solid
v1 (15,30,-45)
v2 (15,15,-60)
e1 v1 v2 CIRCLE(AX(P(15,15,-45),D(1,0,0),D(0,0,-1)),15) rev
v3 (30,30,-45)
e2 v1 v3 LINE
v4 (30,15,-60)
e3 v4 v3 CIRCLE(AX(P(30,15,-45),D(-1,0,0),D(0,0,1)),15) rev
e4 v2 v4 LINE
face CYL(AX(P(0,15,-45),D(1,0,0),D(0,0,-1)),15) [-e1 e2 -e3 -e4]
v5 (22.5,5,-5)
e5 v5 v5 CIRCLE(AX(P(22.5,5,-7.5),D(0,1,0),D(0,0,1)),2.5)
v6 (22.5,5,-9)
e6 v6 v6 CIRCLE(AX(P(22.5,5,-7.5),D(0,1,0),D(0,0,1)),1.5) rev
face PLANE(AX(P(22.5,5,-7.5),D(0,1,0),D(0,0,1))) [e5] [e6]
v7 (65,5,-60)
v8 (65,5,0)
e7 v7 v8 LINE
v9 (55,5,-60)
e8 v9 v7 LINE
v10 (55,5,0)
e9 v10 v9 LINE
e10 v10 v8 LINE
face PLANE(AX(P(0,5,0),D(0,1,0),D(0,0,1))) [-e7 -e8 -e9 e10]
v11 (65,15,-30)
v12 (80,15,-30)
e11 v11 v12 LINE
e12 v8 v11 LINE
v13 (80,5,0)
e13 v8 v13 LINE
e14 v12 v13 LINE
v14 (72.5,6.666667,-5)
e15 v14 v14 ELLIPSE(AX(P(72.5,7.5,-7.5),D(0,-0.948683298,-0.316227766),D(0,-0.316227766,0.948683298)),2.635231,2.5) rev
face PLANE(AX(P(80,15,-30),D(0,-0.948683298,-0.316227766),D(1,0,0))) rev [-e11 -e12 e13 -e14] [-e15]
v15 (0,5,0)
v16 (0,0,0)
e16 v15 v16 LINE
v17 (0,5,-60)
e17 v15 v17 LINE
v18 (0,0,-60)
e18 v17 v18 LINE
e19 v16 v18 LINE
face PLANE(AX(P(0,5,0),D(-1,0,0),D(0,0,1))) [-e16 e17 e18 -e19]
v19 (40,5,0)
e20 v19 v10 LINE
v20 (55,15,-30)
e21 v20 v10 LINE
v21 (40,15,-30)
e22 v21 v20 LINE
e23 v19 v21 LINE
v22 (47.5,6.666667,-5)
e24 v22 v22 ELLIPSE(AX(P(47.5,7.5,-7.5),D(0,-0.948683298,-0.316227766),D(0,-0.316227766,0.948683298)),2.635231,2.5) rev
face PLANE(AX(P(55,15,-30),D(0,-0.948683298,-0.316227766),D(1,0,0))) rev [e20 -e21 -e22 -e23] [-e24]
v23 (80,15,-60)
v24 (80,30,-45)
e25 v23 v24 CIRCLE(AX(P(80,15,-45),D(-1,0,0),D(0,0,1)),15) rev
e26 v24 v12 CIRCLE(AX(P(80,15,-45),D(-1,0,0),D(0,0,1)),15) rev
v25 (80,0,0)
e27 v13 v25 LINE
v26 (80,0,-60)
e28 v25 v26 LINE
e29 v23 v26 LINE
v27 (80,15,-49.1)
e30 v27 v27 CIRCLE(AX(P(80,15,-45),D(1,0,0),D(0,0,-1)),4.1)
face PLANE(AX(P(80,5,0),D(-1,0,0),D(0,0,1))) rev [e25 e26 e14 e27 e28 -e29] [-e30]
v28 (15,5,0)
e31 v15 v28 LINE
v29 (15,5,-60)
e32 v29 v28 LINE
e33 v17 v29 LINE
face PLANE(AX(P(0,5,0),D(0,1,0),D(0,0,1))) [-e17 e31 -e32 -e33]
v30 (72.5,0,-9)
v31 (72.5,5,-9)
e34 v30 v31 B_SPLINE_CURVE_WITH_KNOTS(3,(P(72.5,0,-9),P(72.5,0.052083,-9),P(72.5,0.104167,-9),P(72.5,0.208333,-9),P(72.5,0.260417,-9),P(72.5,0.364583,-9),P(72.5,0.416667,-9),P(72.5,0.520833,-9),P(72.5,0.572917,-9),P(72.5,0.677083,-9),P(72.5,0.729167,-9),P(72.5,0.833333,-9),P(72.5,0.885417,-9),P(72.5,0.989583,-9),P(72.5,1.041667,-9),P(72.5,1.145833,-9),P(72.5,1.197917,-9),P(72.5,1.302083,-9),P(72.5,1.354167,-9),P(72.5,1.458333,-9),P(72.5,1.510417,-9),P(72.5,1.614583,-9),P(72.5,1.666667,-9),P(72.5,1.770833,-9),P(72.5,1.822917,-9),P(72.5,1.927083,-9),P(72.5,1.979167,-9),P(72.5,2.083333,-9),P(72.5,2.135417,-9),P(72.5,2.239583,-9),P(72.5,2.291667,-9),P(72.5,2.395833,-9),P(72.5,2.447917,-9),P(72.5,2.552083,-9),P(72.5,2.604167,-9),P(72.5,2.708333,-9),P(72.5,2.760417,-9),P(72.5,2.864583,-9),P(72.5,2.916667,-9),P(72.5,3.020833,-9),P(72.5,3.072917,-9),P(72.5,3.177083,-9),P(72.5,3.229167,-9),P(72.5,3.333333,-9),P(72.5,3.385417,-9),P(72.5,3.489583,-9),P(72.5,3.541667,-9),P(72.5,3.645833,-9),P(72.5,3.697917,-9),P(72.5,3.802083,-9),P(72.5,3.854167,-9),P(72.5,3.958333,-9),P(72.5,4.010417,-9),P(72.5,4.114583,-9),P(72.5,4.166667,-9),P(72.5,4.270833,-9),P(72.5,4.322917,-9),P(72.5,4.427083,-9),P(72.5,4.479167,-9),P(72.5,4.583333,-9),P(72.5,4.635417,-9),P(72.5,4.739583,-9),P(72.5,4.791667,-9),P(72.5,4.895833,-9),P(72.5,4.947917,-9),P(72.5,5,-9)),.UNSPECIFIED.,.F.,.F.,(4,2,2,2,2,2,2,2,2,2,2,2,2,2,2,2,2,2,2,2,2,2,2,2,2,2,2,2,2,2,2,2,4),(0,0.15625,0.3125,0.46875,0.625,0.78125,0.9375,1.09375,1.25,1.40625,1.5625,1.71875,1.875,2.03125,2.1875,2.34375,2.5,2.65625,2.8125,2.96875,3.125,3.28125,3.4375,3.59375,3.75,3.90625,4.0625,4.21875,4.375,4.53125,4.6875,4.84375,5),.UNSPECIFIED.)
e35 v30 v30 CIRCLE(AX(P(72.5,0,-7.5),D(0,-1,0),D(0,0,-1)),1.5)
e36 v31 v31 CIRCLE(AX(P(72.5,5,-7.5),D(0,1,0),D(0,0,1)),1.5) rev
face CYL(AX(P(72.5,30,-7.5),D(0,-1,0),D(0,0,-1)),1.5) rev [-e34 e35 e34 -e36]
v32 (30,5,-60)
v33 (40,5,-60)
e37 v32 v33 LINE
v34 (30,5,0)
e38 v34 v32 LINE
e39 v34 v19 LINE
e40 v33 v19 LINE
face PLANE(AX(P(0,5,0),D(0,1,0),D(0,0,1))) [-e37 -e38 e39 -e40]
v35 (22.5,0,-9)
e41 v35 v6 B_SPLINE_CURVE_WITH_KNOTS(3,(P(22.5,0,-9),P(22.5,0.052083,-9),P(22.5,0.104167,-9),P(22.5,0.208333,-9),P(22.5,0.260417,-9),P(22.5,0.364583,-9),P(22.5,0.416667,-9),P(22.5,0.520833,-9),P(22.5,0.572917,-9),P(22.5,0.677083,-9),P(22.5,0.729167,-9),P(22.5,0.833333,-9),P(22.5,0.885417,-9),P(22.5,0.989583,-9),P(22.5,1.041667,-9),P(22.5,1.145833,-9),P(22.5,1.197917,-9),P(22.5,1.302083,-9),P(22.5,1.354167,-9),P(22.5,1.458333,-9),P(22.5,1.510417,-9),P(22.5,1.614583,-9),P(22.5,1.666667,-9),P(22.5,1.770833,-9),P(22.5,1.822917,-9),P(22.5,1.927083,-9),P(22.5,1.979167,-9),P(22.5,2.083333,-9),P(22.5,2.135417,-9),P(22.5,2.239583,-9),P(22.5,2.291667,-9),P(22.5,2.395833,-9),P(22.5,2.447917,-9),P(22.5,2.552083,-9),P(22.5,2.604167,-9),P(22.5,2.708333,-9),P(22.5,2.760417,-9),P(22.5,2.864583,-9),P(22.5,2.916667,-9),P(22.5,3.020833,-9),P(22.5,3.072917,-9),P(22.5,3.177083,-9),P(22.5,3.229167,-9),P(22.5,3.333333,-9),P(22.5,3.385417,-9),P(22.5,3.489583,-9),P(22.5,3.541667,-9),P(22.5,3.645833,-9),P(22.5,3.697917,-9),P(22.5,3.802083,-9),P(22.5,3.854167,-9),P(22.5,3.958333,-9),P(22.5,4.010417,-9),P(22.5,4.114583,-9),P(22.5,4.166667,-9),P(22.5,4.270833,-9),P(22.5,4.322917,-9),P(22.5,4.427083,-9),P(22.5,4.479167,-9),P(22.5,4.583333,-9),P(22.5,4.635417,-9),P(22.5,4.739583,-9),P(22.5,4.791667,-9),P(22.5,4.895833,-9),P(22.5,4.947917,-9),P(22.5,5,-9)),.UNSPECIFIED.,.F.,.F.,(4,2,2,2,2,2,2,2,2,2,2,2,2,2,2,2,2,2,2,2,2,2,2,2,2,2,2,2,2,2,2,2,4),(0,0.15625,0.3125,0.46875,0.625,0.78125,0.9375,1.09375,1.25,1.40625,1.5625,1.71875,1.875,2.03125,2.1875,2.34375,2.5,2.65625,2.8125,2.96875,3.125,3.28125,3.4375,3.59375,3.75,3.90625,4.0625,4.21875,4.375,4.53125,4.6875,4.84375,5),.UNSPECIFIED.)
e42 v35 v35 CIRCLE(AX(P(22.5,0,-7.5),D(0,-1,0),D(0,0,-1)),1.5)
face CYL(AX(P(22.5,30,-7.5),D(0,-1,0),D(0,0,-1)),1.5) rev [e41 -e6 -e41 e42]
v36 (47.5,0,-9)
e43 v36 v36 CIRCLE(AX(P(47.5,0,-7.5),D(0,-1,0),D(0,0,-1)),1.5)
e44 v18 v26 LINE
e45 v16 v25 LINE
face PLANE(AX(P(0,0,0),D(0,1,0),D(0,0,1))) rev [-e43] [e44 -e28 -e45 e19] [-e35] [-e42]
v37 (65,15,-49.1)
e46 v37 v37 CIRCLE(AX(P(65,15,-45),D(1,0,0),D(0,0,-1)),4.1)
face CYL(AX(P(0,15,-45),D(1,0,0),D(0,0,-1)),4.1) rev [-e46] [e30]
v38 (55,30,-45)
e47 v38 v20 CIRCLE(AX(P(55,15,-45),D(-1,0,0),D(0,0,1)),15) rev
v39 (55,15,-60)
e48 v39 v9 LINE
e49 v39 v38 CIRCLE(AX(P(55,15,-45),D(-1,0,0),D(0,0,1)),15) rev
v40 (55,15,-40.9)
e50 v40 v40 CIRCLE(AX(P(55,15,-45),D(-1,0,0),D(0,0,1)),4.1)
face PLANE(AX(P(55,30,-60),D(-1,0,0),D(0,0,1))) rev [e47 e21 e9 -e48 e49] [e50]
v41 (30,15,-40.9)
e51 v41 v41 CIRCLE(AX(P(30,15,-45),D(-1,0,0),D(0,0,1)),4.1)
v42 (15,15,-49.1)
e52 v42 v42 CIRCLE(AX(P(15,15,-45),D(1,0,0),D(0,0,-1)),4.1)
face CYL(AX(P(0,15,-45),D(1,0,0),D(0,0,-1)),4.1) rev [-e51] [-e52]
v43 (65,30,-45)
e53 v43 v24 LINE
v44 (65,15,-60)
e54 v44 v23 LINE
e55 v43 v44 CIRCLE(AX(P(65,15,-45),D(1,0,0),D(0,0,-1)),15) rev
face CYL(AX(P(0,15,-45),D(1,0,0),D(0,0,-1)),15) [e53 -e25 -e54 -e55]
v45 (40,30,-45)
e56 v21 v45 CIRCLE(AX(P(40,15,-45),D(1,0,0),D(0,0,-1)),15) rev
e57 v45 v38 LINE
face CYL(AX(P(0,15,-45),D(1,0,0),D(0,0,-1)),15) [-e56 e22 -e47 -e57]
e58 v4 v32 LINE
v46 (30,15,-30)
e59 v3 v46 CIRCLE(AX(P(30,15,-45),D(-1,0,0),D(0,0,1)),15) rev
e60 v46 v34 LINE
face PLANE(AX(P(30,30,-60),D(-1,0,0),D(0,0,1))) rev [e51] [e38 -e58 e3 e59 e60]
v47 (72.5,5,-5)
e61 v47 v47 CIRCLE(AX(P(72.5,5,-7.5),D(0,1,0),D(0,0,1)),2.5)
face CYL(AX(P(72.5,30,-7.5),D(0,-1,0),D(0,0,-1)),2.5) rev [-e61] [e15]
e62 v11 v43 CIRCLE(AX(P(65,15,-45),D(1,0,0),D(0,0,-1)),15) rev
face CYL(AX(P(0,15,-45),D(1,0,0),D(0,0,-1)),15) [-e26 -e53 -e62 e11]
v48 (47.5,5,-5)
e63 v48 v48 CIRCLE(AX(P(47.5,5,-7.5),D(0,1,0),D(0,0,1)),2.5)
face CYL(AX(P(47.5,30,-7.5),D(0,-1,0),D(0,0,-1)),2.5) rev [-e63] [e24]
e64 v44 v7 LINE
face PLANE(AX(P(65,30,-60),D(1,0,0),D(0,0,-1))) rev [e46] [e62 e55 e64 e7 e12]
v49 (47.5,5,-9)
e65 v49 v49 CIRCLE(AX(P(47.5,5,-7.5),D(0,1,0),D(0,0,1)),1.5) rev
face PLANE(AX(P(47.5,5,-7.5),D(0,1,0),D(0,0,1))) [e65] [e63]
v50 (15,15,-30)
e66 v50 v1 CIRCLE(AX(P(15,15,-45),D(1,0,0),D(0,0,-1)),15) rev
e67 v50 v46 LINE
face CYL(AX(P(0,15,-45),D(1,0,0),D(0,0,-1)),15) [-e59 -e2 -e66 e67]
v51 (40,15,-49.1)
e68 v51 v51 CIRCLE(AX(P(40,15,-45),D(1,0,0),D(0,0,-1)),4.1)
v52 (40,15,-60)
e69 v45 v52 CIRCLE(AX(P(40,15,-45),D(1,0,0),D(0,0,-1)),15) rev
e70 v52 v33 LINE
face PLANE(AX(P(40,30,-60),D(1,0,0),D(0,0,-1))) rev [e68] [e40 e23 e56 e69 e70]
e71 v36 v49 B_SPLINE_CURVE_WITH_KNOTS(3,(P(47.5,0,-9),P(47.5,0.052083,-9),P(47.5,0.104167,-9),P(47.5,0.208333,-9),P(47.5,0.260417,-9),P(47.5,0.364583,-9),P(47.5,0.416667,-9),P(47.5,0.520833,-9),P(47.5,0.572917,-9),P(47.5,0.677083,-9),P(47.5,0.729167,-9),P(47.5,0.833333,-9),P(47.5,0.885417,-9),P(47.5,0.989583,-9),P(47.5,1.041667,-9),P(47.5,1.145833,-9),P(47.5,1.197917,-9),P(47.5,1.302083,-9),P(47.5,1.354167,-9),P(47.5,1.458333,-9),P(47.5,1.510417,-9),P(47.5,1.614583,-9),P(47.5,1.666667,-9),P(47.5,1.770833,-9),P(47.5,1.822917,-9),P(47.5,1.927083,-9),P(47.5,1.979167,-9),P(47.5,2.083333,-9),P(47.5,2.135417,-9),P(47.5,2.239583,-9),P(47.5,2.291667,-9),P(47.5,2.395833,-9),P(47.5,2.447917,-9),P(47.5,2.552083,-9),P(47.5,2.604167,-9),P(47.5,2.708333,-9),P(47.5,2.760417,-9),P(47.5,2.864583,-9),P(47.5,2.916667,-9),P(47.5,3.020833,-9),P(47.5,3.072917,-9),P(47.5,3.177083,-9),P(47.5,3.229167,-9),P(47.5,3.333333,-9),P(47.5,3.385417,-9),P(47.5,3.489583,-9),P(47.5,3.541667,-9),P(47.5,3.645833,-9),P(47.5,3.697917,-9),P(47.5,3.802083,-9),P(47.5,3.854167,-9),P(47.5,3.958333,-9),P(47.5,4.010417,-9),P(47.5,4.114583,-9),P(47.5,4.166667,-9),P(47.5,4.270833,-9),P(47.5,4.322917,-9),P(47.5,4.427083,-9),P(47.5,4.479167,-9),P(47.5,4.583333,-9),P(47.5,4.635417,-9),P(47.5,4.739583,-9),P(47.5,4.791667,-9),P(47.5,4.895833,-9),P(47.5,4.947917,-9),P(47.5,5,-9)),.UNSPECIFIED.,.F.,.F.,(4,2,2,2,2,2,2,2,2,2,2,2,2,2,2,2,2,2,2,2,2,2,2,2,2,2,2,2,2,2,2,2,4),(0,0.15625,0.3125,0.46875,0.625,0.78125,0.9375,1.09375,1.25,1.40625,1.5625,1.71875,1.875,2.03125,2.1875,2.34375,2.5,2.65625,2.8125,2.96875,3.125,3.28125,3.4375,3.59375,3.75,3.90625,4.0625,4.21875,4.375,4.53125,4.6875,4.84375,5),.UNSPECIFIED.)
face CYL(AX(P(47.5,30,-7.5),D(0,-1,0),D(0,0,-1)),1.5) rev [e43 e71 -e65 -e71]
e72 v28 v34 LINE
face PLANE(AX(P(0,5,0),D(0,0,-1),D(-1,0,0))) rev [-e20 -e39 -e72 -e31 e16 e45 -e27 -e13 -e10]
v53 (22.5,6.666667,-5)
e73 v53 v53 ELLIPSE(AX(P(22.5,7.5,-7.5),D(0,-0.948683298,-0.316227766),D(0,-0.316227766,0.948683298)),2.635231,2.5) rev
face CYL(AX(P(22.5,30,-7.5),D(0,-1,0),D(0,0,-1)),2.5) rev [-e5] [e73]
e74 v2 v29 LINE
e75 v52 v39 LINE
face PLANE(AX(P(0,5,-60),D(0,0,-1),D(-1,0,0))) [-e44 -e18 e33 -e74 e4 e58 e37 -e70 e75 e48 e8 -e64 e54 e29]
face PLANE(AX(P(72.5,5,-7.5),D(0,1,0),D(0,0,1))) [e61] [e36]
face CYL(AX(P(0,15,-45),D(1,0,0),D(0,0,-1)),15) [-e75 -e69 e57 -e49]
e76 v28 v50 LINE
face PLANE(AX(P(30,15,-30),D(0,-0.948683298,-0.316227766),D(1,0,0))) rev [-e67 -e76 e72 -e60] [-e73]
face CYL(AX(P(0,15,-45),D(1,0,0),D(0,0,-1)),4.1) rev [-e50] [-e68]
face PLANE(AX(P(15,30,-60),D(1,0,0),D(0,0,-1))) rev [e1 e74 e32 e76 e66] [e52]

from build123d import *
from OCP.BRepFilletAPI import BRepFilletAPI_MakeChamfer

# Parameters (mm, degrees)
SKETCH1_W           = 80
SKETCH1_H           = 60
BOSS_EXTRUDE2_DEPTH = 5
SKETCH3_W           = 15
SKETCH3_H           = 30
BOSS_EXTRUDE3_DEPTH = 25
SKETCH5_R           = 4.1
CUT_EXTRUDE2_DEPTH  = 105.403065089
CHAMFER1_SIZE       = 30
CHAMFER1_SIZE_2     = 10
FILLET1_R           = 15
SKETCH6_R           = 1.5
CUT_EXTRUDE3_DEPTH  = 105.403065089
SKETCH8_R           = 2.5
CUT_EXTRUDE5_DEPTH  = 104.07764064


with BuildPart() as part:
    # Sketch1 → Boss-Extrude2 (new body)
    with BuildSketch(Plane(origin=(0, 0, 0), x_dir=(1, 0, 0), z_dir=(0, 1, 0))):
        with Locations((40, 30)):
            Rectangle(SKETCH1_W, SKETCH1_H)
    extrude(amount=BOSS_EXTRUDE2_DEPTH)

    # Sketch3 → Boss-Extrude3 (add)
    with BuildSketch(Plane(origin=(0, 5, 0), x_dir=(1, 0, 0), z_dir=(0, 1, 0))):
        with Locations((72.5, 45)):
            Rectangle(SKETCH3_W, SKETCH3_H)
        with Locations((47.5, 45)):
            Rectangle(SKETCH3_W, SKETCH3_H)
        with Locations((22.5, 45)):
            Rectangle(SKETCH3_W, SKETCH3_H)
    extrude(amount=BOSS_EXTRUDE3_DEPTH)

    # Sketch5 → Cut-Extrude2 (cut, through all)
    with BuildSketch(Plane(origin=(80, 0, 0), x_dir=(0, 0, -1), z_dir=(1, 0, 0))):
        with Locations((45, 15)):
            Circle(SKETCH5_R)
    extrude(amount=-CUT_EXTRUDE2_DEPTH, mode=Mode.SUBTRACT)

    # Chamfer1
    chamfer1_edges_1 = [part.edges().sort_by_distance(p)[0] for p in [
        (72.5, 5, -30),
    ]]
    chamfer1_side_1 = [part.faces().sort_by_distance(p)[0] for p in [
        (72.5, 5, -29.8),
    ]]
    chamfer1_edges_2 = [part.edges().sort_by_distance(p)[0] for p in [
        (47.5, 5, -30),
    ]]
    chamfer1_side_2 = [part.faces().sort_by_distance(p)[0] for p in [
        (47.5, 5, -29.8),
    ]]
    chamfer1_edges_3 = [part.edges().sort_by_distance(p)[0] for p in [
        (22.5, 5, -30),
    ]]
    chamfer1_side_3 = [part.faces().sort_by_distance(p)[0] for p in [
        (22.5, 5, -29.8),
    ]]
    chamfer1 = BRepFilletAPI_MakeChamfer(part.part.solid().wrapped)
    for e in chamfer1_edges_1:
        chamfer1.Add(CHAMFER1_SIZE - 0.0001, CHAMFER1_SIZE_2 - 0.0001, e.wrapped, chamfer1_side_1[0].wrapped)
    for e in chamfer1_edges_2:
        chamfer1.Add(CHAMFER1_SIZE - 0.0001, CHAMFER1_SIZE_2 - 0.0001, e.wrapped, chamfer1_side_2[0].wrapped)
    for e in chamfer1_edges_3:
        chamfer1.Add(CHAMFER1_SIZE - 0.0001, CHAMFER1_SIZE_2 - 0.0001, e.wrapped, chamfer1_side_3[0].wrapped)
    add(Compound.cast(chamfer1.Shape()), mode=Mode.REPLACE)  # a hair under: the kernel refuses the full size

    # Fillet1
    fillet1_edges = [part.edges().sort_by_distance(p)[0] for p in [
        (72.5, 30, -60),
        (47.5, 30, -60),
        (72.5, 30, -30),
        (47.5, 30, -30),
        (22.5, 30, -60),
        (22.5, 30, -30),
    ]]
    fillet(fillet1_edges, radius=FILLET1_R - 0.0001)  # a hair under: the kernel refuses the full size

    # Sketch6 → Cut-Extrude3 (cut, through all)
    with BuildSketch(Plane.XZ):
        with Locations(Location((72.5, -7.5, 0), (0, 0, 270))):
            Circle(SKETCH6_R)
        with Locations(Location((47.5, -7.5, 0), (0, 0, 270))):
            Circle(SKETCH6_R)
        with Locations(Location((22.5, -7.5, 0), (0, 0, 270))):
            Circle(SKETCH6_R)
    extrude(amount=-CUT_EXTRUDE3_DEPTH, mode=Mode.SUBTRACT)

    # Sketch8 → Cut-Extrude5 (cut, through all)
    with BuildSketch(Plane(origin=(0, 5, 0), x_dir=(1, 0, 0), z_dir=(0, 1, 0))):
        with Locations(Location((22.5, 7.5, 0), (0, 0, 270))):
            Circle(SKETCH8_R)
        with Locations(Location((47.5, 7.5, 0), (0, 0, 270))):
            Circle(SKETCH8_R)
        with Locations(Location((72.5, 7.5, 0), (0, 0, 270))):
            Circle(SKETCH8_R)
    extrude(amount=CUT_EXTRUDE5_DEPTH, mode=Mode.SUBTRACT)


solid = part.part
